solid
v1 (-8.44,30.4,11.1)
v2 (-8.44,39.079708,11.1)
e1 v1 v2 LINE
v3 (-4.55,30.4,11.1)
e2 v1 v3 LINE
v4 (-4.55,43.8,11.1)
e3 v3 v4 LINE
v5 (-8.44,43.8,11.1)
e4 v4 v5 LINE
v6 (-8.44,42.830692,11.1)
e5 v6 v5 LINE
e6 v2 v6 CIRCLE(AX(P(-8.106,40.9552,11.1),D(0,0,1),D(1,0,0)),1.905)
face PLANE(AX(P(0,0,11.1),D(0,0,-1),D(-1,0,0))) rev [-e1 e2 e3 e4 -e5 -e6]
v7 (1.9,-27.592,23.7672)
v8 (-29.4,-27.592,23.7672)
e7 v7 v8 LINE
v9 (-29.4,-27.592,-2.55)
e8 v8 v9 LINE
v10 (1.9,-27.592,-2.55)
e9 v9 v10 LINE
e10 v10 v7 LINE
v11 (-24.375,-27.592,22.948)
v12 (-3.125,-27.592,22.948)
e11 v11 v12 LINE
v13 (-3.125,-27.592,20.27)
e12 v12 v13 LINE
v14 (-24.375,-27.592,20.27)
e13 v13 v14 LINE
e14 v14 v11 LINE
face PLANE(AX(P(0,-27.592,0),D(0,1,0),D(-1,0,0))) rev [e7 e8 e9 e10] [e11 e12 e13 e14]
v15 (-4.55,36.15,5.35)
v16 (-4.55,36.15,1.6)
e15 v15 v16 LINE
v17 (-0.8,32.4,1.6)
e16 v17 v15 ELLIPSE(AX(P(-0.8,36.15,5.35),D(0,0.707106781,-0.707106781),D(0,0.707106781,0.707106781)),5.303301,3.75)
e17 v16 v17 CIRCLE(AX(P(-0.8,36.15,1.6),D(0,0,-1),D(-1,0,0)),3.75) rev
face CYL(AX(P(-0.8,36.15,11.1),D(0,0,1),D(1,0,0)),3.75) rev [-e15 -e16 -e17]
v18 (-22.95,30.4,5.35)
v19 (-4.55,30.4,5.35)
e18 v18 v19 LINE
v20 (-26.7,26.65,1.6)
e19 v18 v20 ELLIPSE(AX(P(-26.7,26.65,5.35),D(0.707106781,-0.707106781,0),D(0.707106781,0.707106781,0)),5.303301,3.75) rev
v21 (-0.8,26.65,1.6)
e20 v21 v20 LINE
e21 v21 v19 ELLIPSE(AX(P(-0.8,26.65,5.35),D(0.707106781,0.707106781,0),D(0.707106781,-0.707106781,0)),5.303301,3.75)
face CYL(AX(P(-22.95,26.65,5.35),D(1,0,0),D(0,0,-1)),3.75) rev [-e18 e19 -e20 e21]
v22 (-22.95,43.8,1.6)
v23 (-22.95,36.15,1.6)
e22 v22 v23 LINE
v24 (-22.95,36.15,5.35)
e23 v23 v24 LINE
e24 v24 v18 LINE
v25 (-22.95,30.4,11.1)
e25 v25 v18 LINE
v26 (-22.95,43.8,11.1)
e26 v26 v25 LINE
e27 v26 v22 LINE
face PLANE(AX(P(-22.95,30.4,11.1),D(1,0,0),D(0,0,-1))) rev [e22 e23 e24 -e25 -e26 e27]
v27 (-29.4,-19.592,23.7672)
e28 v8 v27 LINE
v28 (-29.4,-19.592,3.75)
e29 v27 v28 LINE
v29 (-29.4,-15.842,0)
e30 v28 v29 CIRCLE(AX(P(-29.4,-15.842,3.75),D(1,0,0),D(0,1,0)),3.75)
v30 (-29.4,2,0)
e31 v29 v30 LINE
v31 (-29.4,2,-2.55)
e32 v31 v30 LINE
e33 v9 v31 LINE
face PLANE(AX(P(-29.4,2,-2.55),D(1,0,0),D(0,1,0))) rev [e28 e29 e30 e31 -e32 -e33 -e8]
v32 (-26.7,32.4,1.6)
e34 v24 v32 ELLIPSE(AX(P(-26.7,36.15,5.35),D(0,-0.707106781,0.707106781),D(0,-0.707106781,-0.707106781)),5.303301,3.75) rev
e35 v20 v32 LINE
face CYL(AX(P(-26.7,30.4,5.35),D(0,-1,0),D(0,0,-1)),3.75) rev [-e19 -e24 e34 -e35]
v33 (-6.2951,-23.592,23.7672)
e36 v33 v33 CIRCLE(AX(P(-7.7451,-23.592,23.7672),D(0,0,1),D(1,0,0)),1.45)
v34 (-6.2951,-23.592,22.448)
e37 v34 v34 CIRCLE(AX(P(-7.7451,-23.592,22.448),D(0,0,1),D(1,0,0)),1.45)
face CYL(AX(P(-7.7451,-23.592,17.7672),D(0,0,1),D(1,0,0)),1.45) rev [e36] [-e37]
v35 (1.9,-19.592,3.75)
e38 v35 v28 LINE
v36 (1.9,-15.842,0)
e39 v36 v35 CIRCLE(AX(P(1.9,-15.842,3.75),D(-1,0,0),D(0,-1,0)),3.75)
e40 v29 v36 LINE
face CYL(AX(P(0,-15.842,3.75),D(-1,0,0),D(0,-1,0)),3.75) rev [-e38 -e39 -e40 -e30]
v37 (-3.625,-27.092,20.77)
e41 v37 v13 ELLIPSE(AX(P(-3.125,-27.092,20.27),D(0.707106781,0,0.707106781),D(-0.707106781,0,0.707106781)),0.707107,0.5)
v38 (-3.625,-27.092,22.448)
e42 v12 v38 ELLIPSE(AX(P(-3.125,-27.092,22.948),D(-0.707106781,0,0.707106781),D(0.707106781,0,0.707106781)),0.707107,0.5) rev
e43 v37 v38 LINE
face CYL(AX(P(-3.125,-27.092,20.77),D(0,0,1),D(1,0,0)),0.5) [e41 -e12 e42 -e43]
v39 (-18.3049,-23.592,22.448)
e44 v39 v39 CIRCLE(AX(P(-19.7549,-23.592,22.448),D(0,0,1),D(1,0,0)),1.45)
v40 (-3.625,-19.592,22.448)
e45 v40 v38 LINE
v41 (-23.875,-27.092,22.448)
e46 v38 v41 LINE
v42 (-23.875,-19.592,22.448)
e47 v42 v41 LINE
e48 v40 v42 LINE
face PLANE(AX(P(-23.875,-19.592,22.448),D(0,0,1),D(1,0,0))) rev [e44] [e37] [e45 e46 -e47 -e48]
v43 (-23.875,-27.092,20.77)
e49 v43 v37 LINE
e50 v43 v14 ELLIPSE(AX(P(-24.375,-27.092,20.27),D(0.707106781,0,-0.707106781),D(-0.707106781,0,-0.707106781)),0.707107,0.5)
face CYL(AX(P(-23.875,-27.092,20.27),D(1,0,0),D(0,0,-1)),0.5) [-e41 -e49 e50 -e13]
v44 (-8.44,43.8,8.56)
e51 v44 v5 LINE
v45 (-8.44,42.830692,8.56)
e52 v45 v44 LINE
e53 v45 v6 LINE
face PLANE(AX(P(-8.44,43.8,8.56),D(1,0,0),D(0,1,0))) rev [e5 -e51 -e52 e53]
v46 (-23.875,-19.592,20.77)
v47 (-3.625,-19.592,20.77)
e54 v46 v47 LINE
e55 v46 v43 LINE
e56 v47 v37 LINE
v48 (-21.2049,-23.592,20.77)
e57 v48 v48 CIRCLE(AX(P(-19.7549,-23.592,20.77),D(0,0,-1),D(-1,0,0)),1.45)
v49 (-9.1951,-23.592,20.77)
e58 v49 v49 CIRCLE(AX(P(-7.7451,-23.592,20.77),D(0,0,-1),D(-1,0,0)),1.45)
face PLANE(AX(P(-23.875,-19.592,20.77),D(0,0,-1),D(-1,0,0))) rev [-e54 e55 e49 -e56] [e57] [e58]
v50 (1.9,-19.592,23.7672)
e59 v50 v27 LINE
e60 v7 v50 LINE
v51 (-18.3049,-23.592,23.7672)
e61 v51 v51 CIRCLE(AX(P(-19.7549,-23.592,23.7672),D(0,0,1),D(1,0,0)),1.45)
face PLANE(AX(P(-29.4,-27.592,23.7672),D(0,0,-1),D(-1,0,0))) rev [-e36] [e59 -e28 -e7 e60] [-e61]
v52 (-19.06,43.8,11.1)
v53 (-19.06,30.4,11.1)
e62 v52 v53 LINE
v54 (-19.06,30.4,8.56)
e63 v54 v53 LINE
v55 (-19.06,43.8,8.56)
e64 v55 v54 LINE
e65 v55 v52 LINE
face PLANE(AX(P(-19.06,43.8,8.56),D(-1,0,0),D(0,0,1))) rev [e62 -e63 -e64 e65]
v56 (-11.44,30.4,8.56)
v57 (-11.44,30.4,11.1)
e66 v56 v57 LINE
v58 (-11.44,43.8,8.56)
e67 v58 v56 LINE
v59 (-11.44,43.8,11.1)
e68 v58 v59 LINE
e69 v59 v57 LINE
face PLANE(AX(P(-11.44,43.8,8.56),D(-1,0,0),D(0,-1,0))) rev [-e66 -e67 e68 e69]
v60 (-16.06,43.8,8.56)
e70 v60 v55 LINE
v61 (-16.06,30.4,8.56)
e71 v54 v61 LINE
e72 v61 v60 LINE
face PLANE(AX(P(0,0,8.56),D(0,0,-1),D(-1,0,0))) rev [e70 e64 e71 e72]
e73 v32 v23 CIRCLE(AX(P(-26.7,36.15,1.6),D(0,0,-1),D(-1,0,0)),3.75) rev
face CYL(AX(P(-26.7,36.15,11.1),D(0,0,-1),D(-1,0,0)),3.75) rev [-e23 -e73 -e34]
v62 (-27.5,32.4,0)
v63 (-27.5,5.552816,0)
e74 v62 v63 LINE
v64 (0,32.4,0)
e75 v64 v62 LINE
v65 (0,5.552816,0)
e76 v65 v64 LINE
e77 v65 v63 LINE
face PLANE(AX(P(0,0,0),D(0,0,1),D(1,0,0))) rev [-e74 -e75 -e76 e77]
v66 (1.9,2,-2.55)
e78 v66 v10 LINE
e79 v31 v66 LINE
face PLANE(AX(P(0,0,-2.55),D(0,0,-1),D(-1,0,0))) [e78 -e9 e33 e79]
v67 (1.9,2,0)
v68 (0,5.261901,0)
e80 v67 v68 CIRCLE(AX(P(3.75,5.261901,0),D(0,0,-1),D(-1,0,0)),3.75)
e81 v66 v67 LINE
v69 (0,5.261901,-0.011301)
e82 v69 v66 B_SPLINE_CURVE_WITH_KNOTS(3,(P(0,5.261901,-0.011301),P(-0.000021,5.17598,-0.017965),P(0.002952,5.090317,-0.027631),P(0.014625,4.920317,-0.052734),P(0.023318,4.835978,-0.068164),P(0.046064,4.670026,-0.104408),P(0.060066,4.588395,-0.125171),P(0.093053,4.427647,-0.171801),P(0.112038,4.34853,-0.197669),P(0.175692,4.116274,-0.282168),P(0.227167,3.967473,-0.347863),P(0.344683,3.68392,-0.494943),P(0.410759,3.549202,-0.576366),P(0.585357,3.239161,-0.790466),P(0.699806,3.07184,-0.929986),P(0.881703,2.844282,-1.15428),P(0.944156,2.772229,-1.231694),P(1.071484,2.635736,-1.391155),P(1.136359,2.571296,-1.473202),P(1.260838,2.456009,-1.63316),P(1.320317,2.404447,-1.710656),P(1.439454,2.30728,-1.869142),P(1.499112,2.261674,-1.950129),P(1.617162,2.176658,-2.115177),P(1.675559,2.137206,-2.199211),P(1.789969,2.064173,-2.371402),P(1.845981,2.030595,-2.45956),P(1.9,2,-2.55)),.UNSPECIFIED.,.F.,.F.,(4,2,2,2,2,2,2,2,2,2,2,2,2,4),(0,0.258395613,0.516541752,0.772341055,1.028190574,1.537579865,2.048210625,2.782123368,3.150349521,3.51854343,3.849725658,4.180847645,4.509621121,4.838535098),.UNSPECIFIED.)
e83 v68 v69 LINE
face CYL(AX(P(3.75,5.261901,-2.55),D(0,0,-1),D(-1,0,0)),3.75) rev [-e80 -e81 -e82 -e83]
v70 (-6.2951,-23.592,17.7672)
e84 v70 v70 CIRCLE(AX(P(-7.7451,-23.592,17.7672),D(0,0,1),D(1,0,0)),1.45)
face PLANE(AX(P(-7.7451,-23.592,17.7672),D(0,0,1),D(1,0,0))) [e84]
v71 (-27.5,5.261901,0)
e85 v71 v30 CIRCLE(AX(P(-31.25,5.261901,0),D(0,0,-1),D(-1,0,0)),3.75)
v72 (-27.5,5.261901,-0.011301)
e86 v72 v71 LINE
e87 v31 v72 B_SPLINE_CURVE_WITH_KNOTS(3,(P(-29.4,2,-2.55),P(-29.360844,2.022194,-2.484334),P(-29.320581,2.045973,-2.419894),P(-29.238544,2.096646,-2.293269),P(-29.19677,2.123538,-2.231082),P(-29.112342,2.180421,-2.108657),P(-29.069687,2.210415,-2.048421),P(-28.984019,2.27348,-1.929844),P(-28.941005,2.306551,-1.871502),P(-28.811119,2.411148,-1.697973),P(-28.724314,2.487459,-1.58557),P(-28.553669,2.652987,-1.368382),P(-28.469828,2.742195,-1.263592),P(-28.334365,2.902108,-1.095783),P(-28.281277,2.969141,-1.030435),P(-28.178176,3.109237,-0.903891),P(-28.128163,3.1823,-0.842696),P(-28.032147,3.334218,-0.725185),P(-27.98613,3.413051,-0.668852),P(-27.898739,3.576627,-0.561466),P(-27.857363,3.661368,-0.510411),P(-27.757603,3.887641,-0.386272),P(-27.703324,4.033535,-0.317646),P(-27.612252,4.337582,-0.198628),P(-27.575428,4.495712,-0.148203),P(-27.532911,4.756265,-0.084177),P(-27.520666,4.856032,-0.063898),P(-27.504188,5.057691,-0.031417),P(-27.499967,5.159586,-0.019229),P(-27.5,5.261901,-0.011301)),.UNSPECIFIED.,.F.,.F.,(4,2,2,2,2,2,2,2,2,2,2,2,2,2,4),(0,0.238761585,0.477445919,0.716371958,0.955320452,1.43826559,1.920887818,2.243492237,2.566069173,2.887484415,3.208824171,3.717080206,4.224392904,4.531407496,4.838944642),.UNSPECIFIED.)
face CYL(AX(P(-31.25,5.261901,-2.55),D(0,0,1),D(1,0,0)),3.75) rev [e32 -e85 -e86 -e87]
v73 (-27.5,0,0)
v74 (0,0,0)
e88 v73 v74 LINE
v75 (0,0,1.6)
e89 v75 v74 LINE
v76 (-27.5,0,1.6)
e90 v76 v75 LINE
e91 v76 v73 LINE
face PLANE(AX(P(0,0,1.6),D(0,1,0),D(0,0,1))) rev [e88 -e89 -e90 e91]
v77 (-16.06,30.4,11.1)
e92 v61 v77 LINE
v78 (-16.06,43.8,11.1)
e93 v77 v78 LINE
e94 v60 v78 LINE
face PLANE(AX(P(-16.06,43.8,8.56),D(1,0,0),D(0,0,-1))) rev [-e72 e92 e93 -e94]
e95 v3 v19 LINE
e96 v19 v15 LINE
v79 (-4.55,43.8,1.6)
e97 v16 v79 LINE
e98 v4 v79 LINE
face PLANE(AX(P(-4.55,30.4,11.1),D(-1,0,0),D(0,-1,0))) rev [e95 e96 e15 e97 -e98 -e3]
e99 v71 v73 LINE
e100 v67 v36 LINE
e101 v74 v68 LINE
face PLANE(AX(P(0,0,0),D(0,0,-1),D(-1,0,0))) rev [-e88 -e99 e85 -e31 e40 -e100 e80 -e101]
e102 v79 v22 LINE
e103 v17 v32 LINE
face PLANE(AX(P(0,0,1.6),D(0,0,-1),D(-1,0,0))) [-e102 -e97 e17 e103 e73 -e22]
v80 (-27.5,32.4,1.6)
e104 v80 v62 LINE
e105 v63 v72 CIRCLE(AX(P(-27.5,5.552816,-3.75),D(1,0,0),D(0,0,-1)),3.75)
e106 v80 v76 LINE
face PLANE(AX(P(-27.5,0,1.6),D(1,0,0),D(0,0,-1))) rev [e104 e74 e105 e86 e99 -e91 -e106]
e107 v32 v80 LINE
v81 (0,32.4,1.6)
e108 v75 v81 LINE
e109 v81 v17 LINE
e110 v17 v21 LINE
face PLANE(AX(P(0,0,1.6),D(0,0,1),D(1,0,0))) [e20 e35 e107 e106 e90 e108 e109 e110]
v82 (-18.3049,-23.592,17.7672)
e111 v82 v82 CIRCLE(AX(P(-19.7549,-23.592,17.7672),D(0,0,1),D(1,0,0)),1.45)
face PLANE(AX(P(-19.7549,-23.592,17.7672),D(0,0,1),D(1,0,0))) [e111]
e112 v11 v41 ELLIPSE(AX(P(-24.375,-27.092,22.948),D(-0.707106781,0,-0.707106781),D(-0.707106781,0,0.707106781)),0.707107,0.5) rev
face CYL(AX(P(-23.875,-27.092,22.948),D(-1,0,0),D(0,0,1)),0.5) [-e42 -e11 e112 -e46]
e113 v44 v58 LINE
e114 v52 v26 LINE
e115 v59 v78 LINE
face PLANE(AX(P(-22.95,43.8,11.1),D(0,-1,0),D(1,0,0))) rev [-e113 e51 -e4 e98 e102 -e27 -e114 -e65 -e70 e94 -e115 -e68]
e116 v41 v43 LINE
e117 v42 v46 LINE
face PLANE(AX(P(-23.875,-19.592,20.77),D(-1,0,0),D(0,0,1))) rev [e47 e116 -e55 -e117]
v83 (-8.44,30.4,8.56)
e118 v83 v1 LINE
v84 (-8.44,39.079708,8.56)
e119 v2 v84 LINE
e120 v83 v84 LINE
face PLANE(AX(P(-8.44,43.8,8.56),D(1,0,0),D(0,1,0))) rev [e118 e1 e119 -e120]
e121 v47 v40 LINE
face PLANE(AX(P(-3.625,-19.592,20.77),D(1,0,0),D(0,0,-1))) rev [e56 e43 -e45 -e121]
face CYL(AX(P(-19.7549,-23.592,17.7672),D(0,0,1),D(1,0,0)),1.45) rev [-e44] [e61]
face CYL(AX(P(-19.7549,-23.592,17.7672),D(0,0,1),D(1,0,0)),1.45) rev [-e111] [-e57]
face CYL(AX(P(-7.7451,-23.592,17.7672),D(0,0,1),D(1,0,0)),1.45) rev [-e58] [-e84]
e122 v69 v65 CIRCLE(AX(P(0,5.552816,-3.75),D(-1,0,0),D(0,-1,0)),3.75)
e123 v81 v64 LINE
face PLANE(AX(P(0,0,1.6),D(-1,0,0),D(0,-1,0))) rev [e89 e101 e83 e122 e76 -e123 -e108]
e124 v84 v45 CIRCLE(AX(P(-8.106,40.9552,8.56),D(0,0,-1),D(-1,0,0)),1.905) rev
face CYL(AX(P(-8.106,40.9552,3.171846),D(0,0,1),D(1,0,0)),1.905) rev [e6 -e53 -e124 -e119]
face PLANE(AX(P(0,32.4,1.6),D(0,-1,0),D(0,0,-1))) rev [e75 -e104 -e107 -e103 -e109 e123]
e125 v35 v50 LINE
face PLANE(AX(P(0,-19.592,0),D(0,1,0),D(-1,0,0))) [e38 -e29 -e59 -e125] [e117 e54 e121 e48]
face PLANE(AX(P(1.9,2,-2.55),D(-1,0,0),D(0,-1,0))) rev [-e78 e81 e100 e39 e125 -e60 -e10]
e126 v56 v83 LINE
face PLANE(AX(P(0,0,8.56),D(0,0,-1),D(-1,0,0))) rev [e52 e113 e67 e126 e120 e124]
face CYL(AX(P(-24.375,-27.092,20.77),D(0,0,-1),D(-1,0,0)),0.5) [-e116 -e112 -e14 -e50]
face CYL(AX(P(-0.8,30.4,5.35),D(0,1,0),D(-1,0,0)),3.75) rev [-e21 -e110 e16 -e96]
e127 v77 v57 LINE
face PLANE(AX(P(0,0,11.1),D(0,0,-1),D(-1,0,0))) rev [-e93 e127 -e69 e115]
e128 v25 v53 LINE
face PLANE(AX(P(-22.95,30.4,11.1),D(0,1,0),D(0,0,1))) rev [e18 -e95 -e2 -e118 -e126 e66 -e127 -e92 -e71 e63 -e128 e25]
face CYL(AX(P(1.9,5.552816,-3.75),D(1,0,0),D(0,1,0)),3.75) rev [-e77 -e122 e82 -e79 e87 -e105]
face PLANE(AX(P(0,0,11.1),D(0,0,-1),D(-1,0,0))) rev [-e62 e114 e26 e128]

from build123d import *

# Parameters (mm, degrees)
SKETCH1_W           = 27.5
SKETCH1_H           = 32.4
BOSS_EXTRUDE1_DEPTH = 1.6
SKETCH2_W           = 18.4
SKETCH2_H           = 13.4
BOSS_EXTRUDE2_DEPTH = 9.5
SKETCH3_W           = 31.3
SKETCH3_H           = 19.46
BOSS_EXTRUDE3_DEPTH = 2.55
SKETCH6_W           = 3
SKETCH6_H           = 13.4
CUT_EXTRUDE1_DEPTH  = 2.54
CUT_EXTRUDE2_DEPTH  = 2.54
SKETCH9_W           = 31.3
SKETCH9_H           = 2.55
BOSS_EXTRUDE4_DEPTH = 2.132
SKETCH11_W          = 31.3
SKETCH11_H          = 26.3172
BOSS_EXTRUDE5_DEPTH = 8
SKETCH12_W          = 20.25
SKETCH12_H          = 1.678
CUT_EXTRUDE3_DEPTH  = 8
FILLET1_R           = 0.5
SKETCH13_R          = 1.45
CUT_EXTRUDE4_DEPTH  = 6
FILLET2_R           = 3.75
FILLET3_R           = 3.75
FILLET4_R           = 3.75
FILLET5_R           = 3.75
FILLET6_R           = 3.75
FILLET7_R           = 3.75
FILLET8_R           = 3.75
FILLET9_R           = 3.75


# Some blends are built 0.0001 mm under size
with BuildPart() as part:
    # Sketch1 → Boss-Extrude1 (new body)
    with BuildSketch(Plane.XY):
        with Locations((-13.75, 16.2)):
            Rectangle(SKETCH1_W, SKETCH1_H)
    extrude(amount=BOSS_EXTRUDE1_DEPTH)

    # Sketch2 → Boss-Extrude2 (add)
    with BuildSketch(Plane.XY.offset(1.6)):
        with Locations((-13.75, 37.1)):
            Rectangle(SKETCH2_W, SKETCH2_H)
    extrude(amount=BOSS_EXTRUDE2_DEPTH)

    # Sketch3 → Boss-Extrude3 (add)
    with BuildSketch(Plane(origin=(0, 0, 0), x_dir=(-1, 0, 0), z_dir=(0, 0, -1))):
        with Locations((13.75, -7.73)):
            Rectangle(SKETCH3_W, SKETCH3_H)
    extrude(amount=BOSS_EXTRUDE3_DEPTH)

    # Sketch6 → Cut-Extrude1 (cut)
    with BuildSketch(Plane.XY.offset(11.1)):
        with Locations((-17.56, 37.1)):
            Rectangle(SKETCH6_W, SKETCH6_H)
        with Locations((-9.94, 37.1)):
            Rectangle(SKETCH6_W, SKETCH6_H)
    extrude(amount=-CUT_EXTRUDE1_DEPTH, mode=Mode.SUBTRACT)

    # Sketch7 → Cut-Extrude2 (cut)
    with BuildSketch(Plane.XY.offset(11.1)):
        with BuildLine():
            Line((-8.44, 40.9552), (-8.44, 42.830691669))
            ThreePointArc((-8.44, 42.830691669), (-9.566358689, 42.178465098), (-10.011, 40.9552))
            Line((-10.011, 40.9552), (-8.44, 40.9552))
        make_face()
        with BuildLine():
            Line((-8.44, 39.079708331), (-8.44, 40.9552))
            Line((-8.44, 40.9552), (-10.011, 40.9552))
            ThreePointArc((-10.011, 40.9552), (-9.566358689, 39.731934902), (-8.44, 39.079708331))
        make_face()
        with BuildLine():
            ThreePointArc((-6.201, 40.9552), (-6.758961582, 42.302238418), (-8.106, 42.8602))
            Line((-8.106, 42.8602), (-8.106, 40.9552))
            Line((-8.106, 40.9552), (-6.201, 40.9552))
        make_face()
        with BuildLine():
            Line((-6.201, 40.9552), (-8.106, 40.9552))
            Line((-8.106, 40.9552), (-8.106, 39.0502))
            ThreePointArc((-8.106, 39.0502), (-6.758961582, 39.608161582), (-6.201, 40.9552))
        make_face()
        with BuildLine():
            Line((-8.106, 40.9552), (-8.106, 42.8602))
            ThreePointArc((-8.106, 42.8602), (-8.273650486, 42.852808578), (-8.44, 42.830691669))
            Line((-8.44, 42.830691669), (-8.44, 40.9552))
            Line((-8.44, 40.9552), (-8.106, 40.9552))
        make_face()
        with BuildLine():
            Line((-8.106, 39.0502), (-8.106, 40.9552))
            Line((-8.106, 40.9552), (-8.44, 40.9552))
            Line((-8.44, 40.9552), (-8.44, 39.079708331))
            ThreePointArc((-8.44, 39.079708331), (-8.273650486, 39.057591422), (-8.106, 39.0502))
        make_face()
    extrude(amount=-CUT_EXTRUDE2_DEPTH, mode=Mode.SUBTRACT)

    # Sketch9 → Boss-Extrude4 (add)
    with BuildSketch(Plane.XZ.offset(17.46)):
        with Locations((-13.75, -1.275)):
            Rectangle(SKETCH9_W, SKETCH9_H)
    extrude(amount=BOSS_EXTRUDE4_DEPTH)

    # Sketch11 → Boss-Extrude5 (add)
    with BuildSketch(Plane.XZ.offset(19.592)):
        with Locations((-13.75, 10.6086)):
            Rectangle(SKETCH11_W, SKETCH11_H)
    extrude(amount=BOSS_EXTRUDE5_DEPTH)

    # Sketch12 → Cut-Extrude3 (cut)
    with BuildSketch(Plane.XZ.offset(27.592)):
        with Locations((-13.75, 21.609)):
            Rectangle(SKETCH12_W, SKETCH12_H)
    extrude(amount=-CUT_EXTRUDE3_DEPTH, mode=Mode.SUBTRACT)

    # Fillet1
    fillet1_edges = [part.edges().sort_by_distance(p)[0] for p in [
        (-23.875, -27.592, 21.609),
        (-13.75, -27.592, 20.77),
        (-3.625, -27.592, 21.609),
        (-13.75, -27.592, 22.448),
    ]]
    fillet(fillet1_edges, radius=FILLET1_R)

    # Sketch13 → Cut-Extrude4 (cut)
    with BuildSketch(Plane.XY.offset(23.7672)):
        with Locations((-19.7549, -23.592)):
            Circle(SKETCH13_R)
        with Locations((-7.7451, -23.592)):
            Circle(SKETCH13_R)
    extrude(amount=-CUT_EXTRUDE4_DEPTH, mode=Mode.SUBTRACT)

    # Fillet2
    fillet2_edges = [part.edges().sort_by_distance(p)[0] for p in [
        (-13.75, -19.592, 0),
    ]]
    fillet(fillet2_edges, radius=FILLET2_R)

    # Fillet3
    # the kernel refuses this fillet: 3.75 mm, written as the material it adds along each edge
    with BuildSketch(Plane(origin=(0, 2, 0), x_dir=(0, 0, -1), z_dir=(-1, 0, 0))) as fillet3_piece_1:
        with BuildLine():
            CenterArc((3.75, -3.552815785), FILLET3_R, 108.662924885, 71.337075115)
            Line((0, -3.552815785), (0, 0))
            Line((0, 0), (2.55, 0))
        make_face()
    extrude(amount=27.5)

    # Fillet4
    fillet4_edges = [part.edges().sort_by_distance(p)[0] for p in [
        (-13.75, 30.4, 1.6),
    ]]
    fillet(fillet4_edges, radius=FILLET4_R)

    # Fillet5
    fillet5_edges = [part.edges().sort_by_distance(p)[0] for p in [
        (-22.95, 29.525, 1.6),
    ]]
    fillet(fillet5_edges, radius=FILLET5_R)

    # Fillet6
    fillet6_edges = [part.edges().sort_by_distance(p)[0] for p in [
        (-4.55, 29.525, 1.6),
    ]]
    fillet(fillet6_edges, radius=FILLET6_R)

    # Fillet7
    fillet7_edges = [part.edges().sort_by_distance(p)[0] for p in [
        (-22.95, 32.4, 3.475),
    ]]
    fillet(fillet7_edges, radius=FILLET7_R - 0.0001)  # a hair under: the kernel refuses the full size

    # Fillet8
    fillet8_edges = [part.edges().sort_by_distance(p)[0] for p in [
        (-4.55, 32.4, 3.475),
    ]]
    fillet(fillet8_edges, radius=FILLET8_R - 0.0001)  # a hair under: the kernel refuses the full size

    # Fillet9
    # the kernel refuses this fillet: 3.75 mm, written as the material it adds along each edge
    with BuildSketch(Plane(origin=(0, 2, 0), x_dir=(1, 0, 0), z_dir=(0, 0, -1))) as fillet9_piece_1_section:
        with BuildLine():
            CenterArc((3.75, -3.261901286), FILLET9_R, 119.559908379, 60.440091621)
            Line((0, -3.261901286), (0, 0))
            Line((0, 0), (1.9, 0))
        make_face()
    fillet9_piece_1 = extrude(amount=2.55, mode=Mode.PRIVATE)
    fillet9_piece_1 = fillet9_piece_1 - Plane(origin=(1.353199259, 5.552815785, -3.75), x_dir=(0, 0, -1), z_dir=(1, 0, 0)) * Cylinder(3.75, 19, mode=Mode.PRIVATE)
    add(fillet9_piece_1)
    with BuildSketch(Plane(origin=(-27.5, 2, 0), x_dir=(0, 1, 0), z_dir=(0, 0, -1))) as fillet9_piece_2_section:
        with BuildLine():
            CenterArc((3.261901286, -3.75), FILLET9_R, 90, 60.440091621)
            Line((0, -1.9), (0, 0))
            Line((0, 0), (3.261901286, 0))
        make_face()
    fillet9_piece_2 = extrude(amount=2.55, mode=Mode.PRIVATE)
    fillet9_piece_2 = fillet9_piece_2 - Plane(origin=(-28.00314891, 5.552815785, -3.75), x_dir=(0, 0, -1), z_dir=(1, 0, 0)) * Cylinder(3.75, 19, mode=Mode.PRIVATE)
    add(fillet9_piece_2)


solid = part.part
